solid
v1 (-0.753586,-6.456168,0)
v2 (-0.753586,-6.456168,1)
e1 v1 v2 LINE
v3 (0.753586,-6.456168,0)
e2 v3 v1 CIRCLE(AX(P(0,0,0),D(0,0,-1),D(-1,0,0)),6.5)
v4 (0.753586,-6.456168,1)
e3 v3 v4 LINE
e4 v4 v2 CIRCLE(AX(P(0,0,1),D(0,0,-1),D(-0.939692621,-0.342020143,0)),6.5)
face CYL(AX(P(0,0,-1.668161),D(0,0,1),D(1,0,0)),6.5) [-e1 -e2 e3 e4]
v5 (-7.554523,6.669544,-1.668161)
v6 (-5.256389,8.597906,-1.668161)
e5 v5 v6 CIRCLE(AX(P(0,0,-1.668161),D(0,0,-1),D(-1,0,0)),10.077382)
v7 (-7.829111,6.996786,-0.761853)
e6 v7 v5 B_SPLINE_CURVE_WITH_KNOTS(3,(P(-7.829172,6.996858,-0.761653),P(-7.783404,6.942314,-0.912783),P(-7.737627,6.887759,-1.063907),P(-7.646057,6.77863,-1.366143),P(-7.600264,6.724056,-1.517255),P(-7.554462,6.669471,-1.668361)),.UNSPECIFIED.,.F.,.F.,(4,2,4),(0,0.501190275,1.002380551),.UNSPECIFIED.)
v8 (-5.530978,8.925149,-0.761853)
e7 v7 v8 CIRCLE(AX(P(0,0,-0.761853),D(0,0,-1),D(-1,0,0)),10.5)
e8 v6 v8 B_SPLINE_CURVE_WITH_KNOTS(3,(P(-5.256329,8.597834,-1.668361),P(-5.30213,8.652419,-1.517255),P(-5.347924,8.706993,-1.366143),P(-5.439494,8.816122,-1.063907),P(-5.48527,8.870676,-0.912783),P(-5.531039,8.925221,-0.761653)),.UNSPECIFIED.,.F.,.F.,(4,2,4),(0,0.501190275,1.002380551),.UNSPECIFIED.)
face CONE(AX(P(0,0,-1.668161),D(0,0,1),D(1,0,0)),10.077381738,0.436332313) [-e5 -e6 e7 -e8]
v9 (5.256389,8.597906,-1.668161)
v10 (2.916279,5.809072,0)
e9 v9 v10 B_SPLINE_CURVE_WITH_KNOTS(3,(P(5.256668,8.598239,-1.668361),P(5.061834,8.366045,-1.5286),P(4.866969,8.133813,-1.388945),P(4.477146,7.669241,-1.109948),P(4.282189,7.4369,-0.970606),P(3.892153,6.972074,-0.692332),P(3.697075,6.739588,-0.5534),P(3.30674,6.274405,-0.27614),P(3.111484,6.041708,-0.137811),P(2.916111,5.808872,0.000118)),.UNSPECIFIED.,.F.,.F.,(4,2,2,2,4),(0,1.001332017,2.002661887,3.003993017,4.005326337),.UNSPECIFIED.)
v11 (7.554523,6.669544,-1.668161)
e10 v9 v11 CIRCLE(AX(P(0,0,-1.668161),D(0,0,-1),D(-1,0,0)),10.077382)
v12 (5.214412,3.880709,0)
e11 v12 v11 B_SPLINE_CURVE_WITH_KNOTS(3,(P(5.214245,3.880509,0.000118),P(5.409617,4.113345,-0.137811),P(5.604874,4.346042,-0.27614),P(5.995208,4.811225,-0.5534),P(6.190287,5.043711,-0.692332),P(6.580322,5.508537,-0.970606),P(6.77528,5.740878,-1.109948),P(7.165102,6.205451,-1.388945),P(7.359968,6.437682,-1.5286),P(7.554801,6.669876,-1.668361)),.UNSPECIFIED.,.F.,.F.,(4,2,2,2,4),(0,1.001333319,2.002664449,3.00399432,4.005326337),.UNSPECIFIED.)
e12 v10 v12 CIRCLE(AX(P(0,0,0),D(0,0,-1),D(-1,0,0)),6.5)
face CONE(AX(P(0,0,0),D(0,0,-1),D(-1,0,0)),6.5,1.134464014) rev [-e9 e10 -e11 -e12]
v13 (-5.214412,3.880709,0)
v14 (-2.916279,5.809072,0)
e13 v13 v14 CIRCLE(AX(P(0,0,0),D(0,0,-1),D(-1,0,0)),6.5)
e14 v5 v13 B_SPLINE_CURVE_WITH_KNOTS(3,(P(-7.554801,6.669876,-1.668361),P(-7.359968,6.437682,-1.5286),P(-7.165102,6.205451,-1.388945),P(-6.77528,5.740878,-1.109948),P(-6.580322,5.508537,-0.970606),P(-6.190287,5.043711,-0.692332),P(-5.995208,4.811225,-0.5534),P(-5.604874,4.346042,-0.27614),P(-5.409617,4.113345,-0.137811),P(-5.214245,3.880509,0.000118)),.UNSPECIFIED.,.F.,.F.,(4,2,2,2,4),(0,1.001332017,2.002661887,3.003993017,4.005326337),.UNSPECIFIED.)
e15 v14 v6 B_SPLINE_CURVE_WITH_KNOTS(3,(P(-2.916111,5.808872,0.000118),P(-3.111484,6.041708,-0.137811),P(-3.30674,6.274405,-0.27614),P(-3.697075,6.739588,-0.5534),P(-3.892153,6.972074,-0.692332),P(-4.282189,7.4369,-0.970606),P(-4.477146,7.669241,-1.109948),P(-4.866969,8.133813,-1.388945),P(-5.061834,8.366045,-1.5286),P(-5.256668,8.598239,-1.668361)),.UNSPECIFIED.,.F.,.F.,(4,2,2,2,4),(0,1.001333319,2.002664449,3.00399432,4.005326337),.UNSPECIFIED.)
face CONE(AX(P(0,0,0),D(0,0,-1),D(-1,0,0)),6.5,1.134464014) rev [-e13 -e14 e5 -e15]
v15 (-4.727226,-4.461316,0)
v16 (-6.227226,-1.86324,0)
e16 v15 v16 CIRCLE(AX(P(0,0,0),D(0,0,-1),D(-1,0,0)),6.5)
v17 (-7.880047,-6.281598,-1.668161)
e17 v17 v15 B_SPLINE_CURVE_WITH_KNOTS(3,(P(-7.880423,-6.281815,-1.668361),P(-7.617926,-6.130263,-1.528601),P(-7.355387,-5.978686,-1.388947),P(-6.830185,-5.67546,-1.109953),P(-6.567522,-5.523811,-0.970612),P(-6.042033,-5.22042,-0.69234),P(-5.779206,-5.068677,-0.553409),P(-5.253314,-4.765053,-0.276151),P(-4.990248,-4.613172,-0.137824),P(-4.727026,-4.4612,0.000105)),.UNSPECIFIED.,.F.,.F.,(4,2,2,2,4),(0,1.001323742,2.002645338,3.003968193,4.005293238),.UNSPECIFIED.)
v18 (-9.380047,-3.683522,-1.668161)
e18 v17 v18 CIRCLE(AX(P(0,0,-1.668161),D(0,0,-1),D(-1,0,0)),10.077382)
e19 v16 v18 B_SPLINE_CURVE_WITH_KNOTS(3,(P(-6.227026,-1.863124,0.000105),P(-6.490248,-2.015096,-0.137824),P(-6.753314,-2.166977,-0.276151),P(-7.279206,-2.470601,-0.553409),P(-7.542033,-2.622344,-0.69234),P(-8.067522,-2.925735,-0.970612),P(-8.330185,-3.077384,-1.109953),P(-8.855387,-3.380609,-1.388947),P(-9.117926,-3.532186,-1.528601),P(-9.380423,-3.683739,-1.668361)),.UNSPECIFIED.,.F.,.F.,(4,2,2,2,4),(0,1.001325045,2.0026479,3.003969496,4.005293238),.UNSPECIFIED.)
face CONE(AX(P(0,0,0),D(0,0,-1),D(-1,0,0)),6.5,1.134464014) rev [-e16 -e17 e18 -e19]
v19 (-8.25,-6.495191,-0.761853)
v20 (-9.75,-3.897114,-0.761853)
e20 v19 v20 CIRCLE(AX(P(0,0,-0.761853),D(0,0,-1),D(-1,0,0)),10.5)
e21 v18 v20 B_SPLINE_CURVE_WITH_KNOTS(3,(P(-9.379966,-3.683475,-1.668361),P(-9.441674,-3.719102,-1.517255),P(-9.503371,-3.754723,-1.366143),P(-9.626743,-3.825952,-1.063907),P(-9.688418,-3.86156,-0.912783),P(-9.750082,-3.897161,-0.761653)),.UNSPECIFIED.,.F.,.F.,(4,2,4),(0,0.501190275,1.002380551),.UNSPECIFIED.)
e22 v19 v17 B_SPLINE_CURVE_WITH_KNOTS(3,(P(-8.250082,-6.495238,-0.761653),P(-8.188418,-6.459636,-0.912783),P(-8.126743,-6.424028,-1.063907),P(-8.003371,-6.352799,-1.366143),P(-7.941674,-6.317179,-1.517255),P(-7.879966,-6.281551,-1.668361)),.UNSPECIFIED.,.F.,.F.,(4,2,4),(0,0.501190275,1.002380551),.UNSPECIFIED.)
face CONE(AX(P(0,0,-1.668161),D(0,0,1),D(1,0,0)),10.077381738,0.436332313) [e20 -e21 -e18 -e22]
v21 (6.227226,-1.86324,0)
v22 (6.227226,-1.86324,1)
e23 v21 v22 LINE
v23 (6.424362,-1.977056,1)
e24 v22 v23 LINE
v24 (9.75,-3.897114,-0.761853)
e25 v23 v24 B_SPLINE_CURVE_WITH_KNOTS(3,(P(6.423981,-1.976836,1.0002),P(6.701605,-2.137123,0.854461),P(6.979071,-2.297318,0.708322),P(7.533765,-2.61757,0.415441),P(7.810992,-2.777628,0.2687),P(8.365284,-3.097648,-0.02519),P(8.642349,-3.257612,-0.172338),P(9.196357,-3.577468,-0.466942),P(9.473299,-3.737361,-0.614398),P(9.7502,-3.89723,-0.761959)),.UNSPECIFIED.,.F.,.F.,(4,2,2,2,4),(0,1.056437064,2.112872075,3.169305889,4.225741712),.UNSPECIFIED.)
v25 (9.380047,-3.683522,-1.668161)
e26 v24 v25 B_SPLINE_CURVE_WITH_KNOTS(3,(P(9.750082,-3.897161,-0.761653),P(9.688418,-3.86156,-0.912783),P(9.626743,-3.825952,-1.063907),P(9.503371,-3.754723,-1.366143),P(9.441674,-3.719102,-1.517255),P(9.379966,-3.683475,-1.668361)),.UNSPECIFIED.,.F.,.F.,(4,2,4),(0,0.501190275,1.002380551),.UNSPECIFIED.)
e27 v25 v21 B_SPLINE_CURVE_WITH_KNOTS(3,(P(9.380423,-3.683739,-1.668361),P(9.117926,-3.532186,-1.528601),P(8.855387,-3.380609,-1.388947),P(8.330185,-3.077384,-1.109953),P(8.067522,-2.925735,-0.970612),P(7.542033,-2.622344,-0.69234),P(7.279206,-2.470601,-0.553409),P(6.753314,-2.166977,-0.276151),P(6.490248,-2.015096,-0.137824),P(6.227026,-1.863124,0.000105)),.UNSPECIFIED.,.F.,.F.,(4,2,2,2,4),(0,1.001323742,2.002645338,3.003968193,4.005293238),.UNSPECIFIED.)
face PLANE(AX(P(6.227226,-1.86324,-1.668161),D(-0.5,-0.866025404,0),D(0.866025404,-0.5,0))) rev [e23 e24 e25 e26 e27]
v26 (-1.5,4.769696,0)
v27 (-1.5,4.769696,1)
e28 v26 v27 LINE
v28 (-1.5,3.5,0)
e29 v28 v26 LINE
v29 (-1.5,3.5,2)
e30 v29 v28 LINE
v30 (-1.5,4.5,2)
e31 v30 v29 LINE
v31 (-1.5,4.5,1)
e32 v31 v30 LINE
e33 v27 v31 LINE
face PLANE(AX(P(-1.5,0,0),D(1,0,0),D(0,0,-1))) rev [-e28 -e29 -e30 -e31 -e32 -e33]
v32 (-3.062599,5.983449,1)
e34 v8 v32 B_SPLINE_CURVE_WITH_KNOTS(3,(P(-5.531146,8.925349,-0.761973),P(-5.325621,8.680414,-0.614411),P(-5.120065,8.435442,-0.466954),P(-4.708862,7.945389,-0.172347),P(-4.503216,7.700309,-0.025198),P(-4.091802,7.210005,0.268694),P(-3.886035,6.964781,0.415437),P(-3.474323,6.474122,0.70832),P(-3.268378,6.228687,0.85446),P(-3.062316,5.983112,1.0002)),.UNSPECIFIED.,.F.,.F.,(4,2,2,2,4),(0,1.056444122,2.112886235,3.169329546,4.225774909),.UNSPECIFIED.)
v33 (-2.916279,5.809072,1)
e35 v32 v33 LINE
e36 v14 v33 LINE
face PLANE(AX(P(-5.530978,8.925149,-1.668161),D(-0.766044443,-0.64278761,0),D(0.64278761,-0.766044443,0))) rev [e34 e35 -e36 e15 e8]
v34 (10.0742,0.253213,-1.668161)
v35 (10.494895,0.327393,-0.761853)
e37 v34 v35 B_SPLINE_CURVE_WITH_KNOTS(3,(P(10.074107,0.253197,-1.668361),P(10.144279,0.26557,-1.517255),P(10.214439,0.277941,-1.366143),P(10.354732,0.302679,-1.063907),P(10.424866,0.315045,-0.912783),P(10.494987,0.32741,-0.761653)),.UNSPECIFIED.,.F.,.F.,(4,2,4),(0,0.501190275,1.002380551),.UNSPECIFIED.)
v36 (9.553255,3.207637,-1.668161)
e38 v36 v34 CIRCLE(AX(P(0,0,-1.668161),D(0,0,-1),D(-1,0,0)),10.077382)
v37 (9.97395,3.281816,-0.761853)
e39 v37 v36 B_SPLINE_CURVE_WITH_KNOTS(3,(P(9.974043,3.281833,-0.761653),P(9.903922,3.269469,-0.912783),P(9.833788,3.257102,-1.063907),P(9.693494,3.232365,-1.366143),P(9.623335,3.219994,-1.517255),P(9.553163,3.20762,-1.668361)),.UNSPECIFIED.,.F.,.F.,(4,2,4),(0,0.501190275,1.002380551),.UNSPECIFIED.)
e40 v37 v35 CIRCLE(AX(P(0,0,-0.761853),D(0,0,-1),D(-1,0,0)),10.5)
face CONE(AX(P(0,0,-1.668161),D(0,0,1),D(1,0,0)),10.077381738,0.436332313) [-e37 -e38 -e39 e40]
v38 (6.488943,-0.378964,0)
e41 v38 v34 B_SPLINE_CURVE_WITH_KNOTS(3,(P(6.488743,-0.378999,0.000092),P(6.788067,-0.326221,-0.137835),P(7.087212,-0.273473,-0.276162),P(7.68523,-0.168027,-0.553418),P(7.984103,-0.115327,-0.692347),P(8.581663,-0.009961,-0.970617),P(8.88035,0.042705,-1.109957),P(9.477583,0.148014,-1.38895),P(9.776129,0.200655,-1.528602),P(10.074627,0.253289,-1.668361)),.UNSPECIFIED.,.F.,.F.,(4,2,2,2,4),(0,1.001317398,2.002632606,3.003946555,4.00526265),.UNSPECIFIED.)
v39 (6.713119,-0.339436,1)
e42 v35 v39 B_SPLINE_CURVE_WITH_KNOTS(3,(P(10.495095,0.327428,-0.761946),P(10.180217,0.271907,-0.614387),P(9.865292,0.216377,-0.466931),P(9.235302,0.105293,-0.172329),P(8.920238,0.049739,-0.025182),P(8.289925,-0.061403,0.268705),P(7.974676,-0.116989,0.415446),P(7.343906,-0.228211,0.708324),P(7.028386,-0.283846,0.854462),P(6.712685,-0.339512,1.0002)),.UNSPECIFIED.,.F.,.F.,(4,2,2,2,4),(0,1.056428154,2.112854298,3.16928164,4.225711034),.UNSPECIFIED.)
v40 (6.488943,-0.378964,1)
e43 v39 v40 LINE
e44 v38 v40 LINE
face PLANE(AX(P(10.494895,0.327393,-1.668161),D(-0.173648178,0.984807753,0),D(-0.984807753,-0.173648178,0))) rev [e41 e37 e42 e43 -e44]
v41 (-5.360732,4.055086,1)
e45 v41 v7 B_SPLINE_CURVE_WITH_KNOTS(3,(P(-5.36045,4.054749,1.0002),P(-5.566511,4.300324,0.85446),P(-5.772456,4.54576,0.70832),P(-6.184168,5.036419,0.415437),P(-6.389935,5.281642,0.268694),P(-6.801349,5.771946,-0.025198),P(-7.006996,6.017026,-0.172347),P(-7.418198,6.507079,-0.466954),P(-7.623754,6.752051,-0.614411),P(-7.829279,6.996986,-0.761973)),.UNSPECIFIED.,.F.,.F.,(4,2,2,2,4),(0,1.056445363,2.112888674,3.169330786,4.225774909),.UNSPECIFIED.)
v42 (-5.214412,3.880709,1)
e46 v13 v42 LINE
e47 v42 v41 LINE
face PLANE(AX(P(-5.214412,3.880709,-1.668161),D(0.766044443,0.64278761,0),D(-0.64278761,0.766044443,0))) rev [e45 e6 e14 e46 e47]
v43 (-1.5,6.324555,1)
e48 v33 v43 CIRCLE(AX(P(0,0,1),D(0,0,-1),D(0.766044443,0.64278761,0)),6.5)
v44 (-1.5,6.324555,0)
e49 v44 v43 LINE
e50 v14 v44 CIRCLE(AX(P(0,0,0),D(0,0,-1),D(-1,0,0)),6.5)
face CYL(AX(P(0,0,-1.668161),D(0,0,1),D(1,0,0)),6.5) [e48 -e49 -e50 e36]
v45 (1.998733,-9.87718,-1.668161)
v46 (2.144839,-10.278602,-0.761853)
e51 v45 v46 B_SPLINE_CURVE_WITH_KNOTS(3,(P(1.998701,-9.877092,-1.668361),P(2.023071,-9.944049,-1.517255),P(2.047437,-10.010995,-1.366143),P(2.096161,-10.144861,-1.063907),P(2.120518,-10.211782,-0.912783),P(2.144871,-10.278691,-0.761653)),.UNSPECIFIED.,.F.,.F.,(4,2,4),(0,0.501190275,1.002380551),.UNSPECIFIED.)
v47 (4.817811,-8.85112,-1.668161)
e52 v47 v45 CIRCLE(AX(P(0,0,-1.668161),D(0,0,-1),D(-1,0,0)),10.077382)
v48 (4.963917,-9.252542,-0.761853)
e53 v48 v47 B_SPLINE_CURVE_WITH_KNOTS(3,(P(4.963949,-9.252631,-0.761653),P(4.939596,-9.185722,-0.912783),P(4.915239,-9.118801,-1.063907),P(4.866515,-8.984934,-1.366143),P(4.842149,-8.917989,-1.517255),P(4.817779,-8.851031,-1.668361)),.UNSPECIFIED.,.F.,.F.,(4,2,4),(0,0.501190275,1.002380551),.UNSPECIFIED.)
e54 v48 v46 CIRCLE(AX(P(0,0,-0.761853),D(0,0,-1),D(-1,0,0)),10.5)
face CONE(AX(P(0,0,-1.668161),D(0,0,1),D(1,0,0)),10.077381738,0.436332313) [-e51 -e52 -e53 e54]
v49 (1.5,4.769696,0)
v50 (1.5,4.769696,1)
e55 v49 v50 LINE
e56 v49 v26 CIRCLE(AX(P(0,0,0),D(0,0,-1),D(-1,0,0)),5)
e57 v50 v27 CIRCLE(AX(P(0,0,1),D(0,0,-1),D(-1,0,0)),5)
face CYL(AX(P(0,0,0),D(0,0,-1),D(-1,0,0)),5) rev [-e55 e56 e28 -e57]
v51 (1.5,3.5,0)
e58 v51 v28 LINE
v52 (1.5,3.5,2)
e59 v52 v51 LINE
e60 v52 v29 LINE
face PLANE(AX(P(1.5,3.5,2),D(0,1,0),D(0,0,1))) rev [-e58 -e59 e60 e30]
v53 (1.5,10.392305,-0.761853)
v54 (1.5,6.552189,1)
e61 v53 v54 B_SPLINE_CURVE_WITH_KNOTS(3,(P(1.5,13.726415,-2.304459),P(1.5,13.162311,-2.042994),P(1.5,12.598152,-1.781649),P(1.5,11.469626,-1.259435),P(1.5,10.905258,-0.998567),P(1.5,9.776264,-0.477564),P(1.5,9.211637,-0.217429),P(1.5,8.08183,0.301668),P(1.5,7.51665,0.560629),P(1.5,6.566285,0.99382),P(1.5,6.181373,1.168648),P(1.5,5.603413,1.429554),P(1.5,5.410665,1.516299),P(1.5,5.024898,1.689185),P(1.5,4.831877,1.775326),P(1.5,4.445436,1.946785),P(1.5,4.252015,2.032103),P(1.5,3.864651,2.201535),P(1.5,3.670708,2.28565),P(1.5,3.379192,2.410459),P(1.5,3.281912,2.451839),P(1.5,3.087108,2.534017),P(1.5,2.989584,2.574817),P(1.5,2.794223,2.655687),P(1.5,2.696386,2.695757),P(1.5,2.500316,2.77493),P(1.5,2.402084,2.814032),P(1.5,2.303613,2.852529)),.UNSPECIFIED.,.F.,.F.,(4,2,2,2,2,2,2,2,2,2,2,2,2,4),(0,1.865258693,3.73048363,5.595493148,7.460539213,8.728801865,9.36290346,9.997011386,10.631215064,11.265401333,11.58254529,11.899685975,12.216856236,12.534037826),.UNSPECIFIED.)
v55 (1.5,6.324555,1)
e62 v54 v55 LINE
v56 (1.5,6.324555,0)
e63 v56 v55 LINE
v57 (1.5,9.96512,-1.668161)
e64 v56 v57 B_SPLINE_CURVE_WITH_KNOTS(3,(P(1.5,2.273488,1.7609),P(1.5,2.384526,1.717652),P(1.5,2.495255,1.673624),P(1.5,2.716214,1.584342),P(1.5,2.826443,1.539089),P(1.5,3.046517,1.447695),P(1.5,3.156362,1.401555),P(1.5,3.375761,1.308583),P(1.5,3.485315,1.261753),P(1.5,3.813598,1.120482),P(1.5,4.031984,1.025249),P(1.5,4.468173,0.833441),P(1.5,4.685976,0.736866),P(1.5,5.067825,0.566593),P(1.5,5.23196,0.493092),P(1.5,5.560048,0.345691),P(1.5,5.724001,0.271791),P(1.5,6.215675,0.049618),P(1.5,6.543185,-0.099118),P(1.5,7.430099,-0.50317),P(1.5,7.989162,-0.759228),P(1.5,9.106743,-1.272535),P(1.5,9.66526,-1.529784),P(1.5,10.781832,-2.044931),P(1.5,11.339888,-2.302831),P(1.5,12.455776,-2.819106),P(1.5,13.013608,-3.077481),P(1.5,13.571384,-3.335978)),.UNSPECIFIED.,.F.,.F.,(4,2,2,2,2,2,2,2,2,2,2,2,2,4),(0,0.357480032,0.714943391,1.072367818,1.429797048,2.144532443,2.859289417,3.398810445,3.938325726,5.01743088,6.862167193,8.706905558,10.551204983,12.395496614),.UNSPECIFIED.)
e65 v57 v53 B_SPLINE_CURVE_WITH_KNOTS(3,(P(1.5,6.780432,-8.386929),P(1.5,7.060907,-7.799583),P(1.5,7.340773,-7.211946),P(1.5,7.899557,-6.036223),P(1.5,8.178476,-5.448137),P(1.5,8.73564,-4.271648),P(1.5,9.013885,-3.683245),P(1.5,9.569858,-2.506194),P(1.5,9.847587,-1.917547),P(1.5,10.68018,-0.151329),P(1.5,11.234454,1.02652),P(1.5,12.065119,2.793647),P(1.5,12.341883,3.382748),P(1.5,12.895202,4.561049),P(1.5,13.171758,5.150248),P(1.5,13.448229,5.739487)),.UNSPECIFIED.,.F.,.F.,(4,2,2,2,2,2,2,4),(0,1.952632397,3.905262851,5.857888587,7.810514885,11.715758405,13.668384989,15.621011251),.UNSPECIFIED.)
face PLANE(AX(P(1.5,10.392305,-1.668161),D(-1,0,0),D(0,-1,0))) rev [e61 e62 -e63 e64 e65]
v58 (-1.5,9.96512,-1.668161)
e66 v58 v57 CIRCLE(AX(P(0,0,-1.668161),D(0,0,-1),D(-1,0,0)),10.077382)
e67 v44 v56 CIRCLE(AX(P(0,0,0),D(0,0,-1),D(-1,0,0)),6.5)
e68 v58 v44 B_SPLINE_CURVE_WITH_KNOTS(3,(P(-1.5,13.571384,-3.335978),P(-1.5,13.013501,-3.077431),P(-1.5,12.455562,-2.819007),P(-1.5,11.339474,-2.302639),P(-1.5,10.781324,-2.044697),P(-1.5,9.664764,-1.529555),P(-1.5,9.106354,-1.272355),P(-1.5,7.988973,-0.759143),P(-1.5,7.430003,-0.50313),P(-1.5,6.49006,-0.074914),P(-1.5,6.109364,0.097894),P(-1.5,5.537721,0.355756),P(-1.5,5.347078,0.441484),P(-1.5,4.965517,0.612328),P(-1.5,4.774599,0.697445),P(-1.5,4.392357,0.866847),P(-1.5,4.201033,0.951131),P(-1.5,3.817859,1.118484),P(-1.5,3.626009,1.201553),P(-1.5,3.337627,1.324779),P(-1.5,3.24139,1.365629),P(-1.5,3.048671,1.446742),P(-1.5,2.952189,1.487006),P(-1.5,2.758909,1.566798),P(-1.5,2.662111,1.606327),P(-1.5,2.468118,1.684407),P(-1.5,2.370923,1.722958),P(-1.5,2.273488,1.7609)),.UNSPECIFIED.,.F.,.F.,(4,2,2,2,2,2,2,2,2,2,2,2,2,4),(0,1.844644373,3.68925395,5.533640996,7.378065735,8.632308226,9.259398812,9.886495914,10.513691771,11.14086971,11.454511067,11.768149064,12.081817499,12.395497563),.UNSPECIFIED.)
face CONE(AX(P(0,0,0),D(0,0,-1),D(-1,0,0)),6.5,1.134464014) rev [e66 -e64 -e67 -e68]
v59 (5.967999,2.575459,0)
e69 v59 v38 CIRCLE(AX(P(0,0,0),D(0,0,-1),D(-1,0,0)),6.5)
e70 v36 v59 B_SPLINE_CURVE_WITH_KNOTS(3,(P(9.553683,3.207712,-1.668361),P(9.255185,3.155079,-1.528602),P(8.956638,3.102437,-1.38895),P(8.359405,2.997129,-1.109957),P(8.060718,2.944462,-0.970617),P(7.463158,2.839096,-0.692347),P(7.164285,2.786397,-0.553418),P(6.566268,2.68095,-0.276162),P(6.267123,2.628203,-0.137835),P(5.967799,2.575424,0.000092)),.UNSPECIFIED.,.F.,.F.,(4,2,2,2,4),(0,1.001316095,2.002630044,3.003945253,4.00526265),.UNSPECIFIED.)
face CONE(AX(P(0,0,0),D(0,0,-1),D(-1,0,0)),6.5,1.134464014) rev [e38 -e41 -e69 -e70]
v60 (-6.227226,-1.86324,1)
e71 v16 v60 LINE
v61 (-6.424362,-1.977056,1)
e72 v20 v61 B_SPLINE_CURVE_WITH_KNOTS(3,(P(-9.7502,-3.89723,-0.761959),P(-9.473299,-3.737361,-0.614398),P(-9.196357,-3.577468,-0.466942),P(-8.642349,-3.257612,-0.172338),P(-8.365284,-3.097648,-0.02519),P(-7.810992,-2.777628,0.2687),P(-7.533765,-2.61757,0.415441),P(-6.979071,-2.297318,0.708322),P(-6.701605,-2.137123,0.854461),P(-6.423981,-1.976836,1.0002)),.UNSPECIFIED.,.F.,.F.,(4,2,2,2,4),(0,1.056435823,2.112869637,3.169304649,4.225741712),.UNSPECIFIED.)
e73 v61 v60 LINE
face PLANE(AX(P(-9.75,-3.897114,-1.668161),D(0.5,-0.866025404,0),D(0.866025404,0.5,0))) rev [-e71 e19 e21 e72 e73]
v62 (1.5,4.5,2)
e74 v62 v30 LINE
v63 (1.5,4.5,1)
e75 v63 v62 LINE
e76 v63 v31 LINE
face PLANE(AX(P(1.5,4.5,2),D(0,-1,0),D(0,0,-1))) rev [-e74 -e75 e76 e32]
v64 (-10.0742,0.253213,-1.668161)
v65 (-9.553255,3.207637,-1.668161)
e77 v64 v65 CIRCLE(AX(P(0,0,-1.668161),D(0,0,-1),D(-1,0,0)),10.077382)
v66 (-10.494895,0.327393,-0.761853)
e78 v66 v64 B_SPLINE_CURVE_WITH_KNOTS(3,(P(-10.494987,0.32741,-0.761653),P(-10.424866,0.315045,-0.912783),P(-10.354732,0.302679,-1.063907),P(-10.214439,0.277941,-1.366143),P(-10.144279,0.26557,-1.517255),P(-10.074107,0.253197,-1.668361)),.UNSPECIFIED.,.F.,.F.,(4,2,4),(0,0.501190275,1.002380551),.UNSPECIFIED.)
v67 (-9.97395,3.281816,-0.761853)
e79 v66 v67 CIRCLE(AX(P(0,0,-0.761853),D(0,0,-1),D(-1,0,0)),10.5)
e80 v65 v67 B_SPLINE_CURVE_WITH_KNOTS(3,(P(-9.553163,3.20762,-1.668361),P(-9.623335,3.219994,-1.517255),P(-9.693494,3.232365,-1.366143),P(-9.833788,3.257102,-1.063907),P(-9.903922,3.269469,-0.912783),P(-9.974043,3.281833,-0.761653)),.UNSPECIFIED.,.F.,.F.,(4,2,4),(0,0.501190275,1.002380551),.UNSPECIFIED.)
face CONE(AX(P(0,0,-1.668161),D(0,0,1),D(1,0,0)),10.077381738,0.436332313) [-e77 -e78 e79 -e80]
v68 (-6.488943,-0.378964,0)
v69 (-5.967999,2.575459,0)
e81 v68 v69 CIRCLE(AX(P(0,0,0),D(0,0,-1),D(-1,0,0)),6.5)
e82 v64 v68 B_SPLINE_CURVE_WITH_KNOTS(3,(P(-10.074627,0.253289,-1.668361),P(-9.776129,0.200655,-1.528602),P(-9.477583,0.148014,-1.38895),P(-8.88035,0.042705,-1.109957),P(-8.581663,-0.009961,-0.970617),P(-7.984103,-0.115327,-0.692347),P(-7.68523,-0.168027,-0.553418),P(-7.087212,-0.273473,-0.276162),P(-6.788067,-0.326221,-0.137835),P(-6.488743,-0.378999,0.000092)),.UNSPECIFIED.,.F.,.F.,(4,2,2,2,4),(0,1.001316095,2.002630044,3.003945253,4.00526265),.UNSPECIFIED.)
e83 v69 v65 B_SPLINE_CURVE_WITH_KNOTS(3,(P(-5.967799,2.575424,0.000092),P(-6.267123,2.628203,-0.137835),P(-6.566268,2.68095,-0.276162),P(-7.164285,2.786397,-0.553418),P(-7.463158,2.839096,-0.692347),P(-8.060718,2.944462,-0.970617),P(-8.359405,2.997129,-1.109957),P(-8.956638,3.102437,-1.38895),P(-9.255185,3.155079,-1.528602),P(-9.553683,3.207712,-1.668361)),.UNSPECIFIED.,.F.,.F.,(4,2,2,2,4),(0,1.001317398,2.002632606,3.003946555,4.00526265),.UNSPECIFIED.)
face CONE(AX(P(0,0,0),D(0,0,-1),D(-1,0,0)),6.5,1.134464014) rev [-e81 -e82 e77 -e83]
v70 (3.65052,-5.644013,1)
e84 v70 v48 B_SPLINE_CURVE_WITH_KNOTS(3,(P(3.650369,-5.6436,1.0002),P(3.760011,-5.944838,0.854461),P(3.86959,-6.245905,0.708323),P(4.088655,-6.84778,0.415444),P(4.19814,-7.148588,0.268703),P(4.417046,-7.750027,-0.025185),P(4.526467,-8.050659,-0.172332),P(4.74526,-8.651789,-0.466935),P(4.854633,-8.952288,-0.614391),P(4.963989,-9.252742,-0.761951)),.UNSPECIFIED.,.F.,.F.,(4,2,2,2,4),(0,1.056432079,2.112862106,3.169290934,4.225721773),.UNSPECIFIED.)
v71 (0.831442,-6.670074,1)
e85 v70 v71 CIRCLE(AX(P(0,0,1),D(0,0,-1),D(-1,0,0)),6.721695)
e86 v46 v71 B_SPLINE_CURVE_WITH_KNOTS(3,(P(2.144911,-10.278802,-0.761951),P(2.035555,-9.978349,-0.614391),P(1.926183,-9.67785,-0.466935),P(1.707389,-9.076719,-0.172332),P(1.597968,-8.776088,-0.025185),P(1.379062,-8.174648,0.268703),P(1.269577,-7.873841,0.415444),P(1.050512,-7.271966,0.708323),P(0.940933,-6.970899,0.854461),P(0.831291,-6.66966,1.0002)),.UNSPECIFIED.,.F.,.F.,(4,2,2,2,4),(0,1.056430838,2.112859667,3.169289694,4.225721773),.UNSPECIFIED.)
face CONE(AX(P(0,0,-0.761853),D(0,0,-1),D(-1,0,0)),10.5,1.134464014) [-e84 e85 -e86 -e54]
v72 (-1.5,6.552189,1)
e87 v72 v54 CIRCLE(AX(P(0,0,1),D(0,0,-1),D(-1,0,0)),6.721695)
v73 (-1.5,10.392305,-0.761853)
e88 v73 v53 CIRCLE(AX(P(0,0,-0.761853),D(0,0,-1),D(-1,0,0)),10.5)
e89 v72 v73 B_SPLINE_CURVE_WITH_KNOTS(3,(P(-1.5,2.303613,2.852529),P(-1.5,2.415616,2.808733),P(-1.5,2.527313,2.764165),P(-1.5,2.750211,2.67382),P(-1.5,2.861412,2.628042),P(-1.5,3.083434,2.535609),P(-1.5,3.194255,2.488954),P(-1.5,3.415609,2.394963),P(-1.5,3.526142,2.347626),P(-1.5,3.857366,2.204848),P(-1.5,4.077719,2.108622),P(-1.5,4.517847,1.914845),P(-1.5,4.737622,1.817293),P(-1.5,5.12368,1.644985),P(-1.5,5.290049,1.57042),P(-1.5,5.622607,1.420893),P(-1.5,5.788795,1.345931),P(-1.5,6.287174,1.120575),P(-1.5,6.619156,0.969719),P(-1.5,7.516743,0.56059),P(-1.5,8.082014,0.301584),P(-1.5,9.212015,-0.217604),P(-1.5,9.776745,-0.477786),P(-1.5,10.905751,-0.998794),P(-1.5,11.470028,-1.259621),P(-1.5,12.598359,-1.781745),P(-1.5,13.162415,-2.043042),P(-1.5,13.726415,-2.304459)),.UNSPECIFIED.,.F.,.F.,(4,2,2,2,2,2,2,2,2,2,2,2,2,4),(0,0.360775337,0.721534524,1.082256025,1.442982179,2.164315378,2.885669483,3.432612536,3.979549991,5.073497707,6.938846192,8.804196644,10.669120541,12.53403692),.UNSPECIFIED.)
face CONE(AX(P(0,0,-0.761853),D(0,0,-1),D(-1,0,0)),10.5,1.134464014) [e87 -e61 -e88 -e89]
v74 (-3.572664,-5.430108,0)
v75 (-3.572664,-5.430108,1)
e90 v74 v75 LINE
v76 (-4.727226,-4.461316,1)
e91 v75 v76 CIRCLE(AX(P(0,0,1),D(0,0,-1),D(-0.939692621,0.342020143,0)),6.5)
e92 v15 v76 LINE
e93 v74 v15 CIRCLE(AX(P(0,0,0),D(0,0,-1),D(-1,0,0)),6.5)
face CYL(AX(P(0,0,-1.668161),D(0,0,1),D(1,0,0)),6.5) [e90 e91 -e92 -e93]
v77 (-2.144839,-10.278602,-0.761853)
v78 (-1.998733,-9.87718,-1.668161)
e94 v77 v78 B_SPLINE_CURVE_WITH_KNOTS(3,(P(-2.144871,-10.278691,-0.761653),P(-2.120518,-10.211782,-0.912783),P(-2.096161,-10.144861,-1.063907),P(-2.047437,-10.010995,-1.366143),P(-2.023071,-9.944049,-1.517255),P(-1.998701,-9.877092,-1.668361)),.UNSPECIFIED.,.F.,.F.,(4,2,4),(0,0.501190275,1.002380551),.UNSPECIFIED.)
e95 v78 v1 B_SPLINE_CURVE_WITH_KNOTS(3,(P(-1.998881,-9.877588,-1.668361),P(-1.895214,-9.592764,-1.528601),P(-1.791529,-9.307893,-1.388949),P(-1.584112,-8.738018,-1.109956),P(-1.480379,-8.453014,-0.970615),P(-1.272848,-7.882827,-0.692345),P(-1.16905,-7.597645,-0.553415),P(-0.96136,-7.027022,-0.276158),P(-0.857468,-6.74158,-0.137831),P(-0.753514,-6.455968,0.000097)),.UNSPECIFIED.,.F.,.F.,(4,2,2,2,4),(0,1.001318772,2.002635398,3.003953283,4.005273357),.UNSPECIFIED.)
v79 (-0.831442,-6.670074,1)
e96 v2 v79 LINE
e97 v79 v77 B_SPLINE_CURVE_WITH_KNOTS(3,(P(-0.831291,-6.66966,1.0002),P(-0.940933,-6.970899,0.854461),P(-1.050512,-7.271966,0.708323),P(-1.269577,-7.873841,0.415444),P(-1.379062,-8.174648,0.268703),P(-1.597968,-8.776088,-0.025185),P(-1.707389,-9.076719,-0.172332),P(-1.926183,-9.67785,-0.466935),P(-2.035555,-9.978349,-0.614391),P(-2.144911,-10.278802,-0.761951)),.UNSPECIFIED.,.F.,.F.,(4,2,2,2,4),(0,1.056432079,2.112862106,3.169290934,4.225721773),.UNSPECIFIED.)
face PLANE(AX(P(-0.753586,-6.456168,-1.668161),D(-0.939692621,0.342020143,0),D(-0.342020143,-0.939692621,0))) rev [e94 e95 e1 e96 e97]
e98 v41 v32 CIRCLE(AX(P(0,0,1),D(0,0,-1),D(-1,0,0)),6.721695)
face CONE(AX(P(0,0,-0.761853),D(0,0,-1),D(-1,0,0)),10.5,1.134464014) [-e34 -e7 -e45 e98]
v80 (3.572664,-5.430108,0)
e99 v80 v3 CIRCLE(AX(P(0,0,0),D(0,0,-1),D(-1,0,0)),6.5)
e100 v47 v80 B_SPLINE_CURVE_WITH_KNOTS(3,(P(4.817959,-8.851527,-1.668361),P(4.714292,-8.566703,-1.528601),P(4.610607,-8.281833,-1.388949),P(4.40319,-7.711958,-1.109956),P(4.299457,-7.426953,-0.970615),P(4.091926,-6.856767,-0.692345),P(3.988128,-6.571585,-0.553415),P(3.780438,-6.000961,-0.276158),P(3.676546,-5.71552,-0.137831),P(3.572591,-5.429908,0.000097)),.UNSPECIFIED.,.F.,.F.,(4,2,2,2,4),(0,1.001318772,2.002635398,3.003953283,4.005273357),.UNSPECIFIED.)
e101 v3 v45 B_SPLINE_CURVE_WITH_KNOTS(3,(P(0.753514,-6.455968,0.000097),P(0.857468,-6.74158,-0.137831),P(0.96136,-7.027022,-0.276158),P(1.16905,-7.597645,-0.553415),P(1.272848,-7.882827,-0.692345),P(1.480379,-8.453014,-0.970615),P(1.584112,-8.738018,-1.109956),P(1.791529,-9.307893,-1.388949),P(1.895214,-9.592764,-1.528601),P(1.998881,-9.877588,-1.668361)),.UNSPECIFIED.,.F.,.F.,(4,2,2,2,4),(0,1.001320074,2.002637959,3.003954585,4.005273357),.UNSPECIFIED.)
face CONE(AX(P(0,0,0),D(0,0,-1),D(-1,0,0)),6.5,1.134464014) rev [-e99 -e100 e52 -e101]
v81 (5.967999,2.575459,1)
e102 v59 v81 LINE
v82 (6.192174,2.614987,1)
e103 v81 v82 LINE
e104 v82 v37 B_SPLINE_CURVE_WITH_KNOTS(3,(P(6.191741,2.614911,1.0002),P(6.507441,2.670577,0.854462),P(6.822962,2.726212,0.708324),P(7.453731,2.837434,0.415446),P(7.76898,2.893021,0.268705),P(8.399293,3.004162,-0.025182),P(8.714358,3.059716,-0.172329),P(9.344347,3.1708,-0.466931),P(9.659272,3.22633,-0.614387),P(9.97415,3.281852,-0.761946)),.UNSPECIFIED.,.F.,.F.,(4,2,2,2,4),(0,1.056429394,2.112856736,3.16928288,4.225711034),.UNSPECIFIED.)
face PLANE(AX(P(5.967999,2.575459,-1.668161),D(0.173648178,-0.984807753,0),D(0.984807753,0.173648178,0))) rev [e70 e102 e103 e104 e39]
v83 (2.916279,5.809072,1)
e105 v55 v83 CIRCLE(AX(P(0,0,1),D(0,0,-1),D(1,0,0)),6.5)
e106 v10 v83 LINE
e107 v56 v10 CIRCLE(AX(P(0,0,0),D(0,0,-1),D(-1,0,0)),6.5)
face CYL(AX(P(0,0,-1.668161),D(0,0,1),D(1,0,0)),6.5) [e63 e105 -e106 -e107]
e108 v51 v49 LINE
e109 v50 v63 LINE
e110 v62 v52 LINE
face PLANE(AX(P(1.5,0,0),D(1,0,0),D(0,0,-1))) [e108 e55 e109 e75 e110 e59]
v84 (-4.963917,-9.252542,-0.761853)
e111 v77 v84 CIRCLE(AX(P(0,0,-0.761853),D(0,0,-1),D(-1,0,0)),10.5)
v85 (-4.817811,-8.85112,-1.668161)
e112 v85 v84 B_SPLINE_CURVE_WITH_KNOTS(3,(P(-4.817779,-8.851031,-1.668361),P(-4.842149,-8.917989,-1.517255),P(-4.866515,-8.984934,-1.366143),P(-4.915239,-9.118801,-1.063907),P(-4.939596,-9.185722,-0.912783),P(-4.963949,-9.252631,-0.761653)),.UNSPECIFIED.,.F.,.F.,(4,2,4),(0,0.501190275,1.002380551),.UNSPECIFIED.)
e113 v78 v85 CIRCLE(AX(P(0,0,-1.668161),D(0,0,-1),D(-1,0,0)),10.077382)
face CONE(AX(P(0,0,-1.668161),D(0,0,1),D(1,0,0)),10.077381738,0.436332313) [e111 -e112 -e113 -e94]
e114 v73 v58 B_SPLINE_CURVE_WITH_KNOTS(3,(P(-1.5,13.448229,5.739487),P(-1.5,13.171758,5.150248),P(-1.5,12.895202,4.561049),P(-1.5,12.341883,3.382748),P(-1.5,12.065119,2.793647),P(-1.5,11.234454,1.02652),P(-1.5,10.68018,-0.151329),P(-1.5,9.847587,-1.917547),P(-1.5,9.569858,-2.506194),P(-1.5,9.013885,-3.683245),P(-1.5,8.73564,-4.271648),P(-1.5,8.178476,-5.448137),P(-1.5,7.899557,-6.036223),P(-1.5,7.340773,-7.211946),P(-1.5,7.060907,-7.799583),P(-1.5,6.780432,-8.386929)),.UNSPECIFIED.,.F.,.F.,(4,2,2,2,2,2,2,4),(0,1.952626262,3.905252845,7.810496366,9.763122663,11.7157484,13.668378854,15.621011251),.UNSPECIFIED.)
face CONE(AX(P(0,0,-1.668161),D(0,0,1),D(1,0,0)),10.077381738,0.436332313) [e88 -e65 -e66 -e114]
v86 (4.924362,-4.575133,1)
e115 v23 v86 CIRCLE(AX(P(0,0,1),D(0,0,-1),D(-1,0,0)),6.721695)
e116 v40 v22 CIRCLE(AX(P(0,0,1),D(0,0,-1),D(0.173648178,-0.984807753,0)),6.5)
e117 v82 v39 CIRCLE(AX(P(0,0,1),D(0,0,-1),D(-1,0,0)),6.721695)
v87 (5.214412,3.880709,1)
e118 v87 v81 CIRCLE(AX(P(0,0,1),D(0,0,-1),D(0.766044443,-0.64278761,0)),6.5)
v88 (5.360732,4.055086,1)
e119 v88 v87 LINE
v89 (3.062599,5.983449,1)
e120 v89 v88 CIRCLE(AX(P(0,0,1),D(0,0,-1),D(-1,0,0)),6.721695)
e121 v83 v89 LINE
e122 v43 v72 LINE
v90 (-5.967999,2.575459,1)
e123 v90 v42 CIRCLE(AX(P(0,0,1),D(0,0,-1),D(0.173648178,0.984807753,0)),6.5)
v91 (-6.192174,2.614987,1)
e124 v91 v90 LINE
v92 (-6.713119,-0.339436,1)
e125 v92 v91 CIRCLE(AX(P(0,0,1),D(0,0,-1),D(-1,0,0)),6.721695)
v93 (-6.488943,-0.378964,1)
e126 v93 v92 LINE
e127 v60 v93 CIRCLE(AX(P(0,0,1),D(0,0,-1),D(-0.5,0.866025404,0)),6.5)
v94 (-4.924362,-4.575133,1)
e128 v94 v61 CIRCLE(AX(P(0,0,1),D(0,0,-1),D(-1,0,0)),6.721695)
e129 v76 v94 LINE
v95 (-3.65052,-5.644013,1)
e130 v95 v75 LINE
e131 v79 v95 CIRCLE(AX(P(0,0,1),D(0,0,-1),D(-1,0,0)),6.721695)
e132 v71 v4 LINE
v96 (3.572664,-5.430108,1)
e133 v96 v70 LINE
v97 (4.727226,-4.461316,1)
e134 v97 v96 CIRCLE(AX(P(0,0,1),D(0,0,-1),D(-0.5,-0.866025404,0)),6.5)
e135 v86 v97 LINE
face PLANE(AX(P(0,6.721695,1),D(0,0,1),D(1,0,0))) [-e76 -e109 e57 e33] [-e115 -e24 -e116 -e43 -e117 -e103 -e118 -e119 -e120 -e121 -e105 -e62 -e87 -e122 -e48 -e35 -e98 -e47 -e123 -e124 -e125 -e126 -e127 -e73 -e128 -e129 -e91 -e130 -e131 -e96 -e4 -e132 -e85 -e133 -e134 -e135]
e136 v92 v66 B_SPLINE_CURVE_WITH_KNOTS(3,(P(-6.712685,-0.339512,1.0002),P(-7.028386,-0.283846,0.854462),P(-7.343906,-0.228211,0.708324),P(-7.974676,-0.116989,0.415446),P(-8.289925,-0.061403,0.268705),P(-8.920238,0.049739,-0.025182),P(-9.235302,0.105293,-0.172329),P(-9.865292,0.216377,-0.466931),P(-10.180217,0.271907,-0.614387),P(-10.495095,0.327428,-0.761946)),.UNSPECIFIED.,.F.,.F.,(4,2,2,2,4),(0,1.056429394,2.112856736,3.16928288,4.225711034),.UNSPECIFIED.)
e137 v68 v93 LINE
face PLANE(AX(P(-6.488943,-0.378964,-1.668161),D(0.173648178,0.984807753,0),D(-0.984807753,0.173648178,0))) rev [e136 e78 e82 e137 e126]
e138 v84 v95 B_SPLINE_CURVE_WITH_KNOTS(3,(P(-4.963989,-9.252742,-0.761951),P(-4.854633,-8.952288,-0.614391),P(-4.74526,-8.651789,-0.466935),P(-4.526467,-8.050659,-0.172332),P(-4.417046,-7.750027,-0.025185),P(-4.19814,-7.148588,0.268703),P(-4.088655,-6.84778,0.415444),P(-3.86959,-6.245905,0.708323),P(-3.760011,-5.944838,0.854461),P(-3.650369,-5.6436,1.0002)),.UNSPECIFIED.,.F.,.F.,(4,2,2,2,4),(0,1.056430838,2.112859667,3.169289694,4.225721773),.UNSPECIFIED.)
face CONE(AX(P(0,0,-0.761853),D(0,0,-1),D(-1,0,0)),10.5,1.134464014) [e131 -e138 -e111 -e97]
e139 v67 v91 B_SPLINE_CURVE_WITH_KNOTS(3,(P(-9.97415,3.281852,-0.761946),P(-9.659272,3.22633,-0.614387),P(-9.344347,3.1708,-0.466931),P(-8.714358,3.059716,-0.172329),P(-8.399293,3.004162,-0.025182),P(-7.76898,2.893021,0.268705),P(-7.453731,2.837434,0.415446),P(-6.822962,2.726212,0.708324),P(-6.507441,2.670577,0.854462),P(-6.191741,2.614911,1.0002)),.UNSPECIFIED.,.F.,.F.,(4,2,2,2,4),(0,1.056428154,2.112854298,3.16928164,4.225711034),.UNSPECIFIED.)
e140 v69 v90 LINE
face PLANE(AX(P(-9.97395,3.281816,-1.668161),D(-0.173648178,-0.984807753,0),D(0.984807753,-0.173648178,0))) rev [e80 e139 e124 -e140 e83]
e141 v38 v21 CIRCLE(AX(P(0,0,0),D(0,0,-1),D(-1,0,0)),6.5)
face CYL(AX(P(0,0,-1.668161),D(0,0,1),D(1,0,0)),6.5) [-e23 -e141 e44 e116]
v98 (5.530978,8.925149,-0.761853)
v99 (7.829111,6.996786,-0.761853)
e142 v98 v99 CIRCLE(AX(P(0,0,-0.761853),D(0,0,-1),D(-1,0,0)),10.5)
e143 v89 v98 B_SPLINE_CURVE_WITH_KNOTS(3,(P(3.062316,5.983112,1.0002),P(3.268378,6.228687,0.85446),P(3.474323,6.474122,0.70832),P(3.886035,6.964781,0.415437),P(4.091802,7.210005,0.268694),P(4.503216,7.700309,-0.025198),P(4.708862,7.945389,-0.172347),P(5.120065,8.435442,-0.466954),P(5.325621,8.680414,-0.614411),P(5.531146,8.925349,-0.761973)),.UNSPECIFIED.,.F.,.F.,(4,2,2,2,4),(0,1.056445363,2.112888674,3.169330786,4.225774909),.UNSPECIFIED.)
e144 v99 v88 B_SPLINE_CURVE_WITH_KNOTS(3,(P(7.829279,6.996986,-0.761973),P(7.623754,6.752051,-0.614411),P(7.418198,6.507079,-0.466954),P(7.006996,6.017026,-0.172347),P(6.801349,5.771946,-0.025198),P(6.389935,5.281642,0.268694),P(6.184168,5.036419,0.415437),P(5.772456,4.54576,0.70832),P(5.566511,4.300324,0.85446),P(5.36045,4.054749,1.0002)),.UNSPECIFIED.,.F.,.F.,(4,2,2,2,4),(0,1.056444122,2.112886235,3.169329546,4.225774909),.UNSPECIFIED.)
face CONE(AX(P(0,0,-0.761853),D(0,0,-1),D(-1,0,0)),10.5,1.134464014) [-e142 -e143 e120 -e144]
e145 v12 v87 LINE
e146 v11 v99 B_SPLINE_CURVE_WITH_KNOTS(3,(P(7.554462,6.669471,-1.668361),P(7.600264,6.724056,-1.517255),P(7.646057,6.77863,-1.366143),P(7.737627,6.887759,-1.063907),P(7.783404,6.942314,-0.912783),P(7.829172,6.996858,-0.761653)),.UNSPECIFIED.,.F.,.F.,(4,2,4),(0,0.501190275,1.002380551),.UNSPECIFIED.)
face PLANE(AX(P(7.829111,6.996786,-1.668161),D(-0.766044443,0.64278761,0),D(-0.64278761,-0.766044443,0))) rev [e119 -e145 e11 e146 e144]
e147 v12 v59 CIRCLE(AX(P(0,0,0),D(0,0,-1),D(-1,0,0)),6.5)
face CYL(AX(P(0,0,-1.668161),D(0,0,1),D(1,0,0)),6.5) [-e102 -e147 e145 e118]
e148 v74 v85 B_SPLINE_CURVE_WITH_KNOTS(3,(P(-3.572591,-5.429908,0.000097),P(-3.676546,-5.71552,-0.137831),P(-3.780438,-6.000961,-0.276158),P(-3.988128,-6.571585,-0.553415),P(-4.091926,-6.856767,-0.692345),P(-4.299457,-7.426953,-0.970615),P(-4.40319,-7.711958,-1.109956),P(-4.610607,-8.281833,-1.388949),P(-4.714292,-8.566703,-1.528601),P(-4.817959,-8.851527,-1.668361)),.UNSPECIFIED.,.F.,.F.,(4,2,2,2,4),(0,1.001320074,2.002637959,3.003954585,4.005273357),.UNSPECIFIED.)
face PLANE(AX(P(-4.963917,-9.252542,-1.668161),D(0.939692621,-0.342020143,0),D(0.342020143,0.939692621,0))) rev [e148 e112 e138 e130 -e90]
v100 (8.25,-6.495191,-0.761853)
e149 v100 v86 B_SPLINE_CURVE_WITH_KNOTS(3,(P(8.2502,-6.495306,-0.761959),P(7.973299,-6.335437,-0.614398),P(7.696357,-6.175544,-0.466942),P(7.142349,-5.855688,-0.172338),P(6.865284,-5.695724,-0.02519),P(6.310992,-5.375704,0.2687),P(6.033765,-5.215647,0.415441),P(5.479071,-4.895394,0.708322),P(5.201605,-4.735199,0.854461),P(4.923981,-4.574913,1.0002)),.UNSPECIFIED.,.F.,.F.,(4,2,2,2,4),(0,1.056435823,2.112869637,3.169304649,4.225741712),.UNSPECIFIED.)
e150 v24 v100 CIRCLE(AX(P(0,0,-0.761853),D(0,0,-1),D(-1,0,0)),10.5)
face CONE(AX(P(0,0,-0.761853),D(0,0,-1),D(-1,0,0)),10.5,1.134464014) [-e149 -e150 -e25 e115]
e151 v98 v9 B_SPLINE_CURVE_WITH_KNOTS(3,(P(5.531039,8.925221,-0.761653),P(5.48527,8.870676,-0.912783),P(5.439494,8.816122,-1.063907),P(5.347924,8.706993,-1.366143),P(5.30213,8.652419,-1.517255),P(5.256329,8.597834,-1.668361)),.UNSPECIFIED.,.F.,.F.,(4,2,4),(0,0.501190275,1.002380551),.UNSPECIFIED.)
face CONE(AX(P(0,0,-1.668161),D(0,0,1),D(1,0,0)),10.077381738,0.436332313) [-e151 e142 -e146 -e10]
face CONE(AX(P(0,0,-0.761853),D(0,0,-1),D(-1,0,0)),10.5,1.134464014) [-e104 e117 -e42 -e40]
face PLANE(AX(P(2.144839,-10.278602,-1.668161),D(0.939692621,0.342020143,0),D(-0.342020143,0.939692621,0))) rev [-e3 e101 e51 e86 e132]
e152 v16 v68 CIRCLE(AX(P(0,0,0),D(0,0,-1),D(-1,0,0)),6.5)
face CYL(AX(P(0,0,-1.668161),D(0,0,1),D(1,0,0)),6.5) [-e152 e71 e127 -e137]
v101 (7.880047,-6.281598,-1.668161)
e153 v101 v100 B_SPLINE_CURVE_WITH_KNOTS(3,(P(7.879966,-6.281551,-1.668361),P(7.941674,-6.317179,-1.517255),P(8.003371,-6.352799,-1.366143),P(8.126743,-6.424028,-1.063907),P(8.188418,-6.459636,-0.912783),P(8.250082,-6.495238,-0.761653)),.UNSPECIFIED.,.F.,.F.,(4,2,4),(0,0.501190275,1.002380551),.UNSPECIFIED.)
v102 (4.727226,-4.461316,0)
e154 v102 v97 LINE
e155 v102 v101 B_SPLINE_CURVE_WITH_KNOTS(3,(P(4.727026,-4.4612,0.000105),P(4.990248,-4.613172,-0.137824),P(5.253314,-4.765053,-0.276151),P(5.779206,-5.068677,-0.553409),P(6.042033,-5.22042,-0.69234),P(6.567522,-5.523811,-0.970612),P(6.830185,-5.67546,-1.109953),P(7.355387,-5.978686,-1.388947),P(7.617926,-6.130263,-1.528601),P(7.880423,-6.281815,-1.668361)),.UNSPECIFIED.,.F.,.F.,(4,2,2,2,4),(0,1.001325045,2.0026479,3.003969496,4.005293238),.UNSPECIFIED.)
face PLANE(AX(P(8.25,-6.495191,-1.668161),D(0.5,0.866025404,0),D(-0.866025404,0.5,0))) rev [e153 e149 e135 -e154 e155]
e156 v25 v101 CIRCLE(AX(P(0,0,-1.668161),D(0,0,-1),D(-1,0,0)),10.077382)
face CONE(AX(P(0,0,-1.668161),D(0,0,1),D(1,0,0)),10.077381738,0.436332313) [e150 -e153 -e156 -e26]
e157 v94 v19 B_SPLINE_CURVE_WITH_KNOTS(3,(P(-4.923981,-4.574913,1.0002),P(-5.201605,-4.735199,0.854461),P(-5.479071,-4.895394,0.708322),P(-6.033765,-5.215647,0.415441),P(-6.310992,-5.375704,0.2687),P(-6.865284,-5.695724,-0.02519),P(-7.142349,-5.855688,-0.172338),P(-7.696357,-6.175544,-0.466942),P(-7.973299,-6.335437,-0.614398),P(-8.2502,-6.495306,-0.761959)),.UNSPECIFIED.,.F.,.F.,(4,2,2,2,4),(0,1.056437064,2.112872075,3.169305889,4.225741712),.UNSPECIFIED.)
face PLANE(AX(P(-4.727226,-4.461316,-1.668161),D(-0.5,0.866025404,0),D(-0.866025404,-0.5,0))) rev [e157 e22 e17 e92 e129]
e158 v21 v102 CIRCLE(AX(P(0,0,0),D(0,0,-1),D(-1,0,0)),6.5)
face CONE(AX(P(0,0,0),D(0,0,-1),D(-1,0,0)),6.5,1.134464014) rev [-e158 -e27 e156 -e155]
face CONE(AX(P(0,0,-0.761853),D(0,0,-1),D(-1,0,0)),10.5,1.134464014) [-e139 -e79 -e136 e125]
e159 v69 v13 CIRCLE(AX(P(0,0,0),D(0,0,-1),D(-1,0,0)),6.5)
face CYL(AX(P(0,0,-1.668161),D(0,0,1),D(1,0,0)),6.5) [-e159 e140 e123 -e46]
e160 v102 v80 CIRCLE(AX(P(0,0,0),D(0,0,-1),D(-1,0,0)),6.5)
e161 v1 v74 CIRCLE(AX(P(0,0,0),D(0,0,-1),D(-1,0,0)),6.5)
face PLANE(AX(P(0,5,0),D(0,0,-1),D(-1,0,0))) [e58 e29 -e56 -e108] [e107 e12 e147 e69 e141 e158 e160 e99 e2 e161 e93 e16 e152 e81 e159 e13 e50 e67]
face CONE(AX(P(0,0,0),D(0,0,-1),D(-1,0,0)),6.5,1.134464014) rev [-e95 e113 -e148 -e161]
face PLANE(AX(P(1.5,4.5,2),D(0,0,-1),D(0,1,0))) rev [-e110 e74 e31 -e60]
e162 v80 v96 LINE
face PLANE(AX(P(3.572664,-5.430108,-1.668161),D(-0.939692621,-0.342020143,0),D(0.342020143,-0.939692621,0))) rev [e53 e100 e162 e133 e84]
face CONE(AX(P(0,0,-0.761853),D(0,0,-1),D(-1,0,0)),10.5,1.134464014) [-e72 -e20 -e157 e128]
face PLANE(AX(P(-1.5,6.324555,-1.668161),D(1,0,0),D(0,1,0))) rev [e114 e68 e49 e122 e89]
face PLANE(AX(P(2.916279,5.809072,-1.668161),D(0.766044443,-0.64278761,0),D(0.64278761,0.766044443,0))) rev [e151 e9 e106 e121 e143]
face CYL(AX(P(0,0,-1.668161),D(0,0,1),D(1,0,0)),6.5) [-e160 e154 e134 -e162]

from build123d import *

# Parameters (mm, degrees)
CUT_EXTRUDE1_DEPTH  = 15.942649011
CIRPATTERN1_COUNT   = 9
BOSS_EXTRUDE1_DEPTH = 1.5


with BuildPart() as part:
    # Sketch1 → Revolve1 (revolve)
    with BuildSketch(Plane(origin=(0, 0, 0), x_dir=(0, 0, -1), z_dir=(1, 0, 0))):
        Polygon((0.761852714, 10.5), (-1, 6.721694663), (-1, 5), (0, 5), (0, 6.5), (1.668160501, 10.077381738), align=None)
    revolve(axis=Axis((0, 0, 0), (0, 0, 1)))

    # Sketch2 → Cut-Extrude1 (cut, symmetric)
    with BuildSketch(Plane.XY):
        with BuildLine():
            Line((1.5, 10.392304845), (1.5, 6.32455532))
            ThreePointArc((1.5, 6.32455532), (2.223130932, 6.108002035), (2.916279132, 5.809071873))
            Line((2.916279132, 5.809071873), (5.530978126, 8.925148793))
            ThreePointArc((5.530978126, 8.925148793), (3.591211505, 9.866772518), (1.5, 10.392304845))
        make_face()
    cut_extrude1 = extrude(amount=CUT_EXTRUDE1_DEPTH, both=True, mode=Mode.SUBTRACT)

    # CirPattern1: Cut-Extrude1 ×9 about axis
    cirpattern1_axis = Axis((0, 0, -1.801568526), (0, 0, 1))
    for i in range(1, CIRPATTERN1_COUNT):
        add(cut_extrude1.rotate(cirpattern1_axis, i * 360 / CIRPATTERN1_COUNT), mode=Mode.SUBTRACT)

    # Sketch3 → Boss-Extrude1 (add, symmetric)
    with BuildSketch(Plane(origin=(0, 0, 0), x_dir=(0, 0, -1), z_dir=(1, 0, 0))):
        Polygon((-2, 4.5), (-1, 4.5), (-1, 5), (0, 5), (0, 3.5), (-2, 3.5), align=None)
    extrude(amount=BOSS_EXTRUDE1_DEPTH, both=True)


solid = part.part
